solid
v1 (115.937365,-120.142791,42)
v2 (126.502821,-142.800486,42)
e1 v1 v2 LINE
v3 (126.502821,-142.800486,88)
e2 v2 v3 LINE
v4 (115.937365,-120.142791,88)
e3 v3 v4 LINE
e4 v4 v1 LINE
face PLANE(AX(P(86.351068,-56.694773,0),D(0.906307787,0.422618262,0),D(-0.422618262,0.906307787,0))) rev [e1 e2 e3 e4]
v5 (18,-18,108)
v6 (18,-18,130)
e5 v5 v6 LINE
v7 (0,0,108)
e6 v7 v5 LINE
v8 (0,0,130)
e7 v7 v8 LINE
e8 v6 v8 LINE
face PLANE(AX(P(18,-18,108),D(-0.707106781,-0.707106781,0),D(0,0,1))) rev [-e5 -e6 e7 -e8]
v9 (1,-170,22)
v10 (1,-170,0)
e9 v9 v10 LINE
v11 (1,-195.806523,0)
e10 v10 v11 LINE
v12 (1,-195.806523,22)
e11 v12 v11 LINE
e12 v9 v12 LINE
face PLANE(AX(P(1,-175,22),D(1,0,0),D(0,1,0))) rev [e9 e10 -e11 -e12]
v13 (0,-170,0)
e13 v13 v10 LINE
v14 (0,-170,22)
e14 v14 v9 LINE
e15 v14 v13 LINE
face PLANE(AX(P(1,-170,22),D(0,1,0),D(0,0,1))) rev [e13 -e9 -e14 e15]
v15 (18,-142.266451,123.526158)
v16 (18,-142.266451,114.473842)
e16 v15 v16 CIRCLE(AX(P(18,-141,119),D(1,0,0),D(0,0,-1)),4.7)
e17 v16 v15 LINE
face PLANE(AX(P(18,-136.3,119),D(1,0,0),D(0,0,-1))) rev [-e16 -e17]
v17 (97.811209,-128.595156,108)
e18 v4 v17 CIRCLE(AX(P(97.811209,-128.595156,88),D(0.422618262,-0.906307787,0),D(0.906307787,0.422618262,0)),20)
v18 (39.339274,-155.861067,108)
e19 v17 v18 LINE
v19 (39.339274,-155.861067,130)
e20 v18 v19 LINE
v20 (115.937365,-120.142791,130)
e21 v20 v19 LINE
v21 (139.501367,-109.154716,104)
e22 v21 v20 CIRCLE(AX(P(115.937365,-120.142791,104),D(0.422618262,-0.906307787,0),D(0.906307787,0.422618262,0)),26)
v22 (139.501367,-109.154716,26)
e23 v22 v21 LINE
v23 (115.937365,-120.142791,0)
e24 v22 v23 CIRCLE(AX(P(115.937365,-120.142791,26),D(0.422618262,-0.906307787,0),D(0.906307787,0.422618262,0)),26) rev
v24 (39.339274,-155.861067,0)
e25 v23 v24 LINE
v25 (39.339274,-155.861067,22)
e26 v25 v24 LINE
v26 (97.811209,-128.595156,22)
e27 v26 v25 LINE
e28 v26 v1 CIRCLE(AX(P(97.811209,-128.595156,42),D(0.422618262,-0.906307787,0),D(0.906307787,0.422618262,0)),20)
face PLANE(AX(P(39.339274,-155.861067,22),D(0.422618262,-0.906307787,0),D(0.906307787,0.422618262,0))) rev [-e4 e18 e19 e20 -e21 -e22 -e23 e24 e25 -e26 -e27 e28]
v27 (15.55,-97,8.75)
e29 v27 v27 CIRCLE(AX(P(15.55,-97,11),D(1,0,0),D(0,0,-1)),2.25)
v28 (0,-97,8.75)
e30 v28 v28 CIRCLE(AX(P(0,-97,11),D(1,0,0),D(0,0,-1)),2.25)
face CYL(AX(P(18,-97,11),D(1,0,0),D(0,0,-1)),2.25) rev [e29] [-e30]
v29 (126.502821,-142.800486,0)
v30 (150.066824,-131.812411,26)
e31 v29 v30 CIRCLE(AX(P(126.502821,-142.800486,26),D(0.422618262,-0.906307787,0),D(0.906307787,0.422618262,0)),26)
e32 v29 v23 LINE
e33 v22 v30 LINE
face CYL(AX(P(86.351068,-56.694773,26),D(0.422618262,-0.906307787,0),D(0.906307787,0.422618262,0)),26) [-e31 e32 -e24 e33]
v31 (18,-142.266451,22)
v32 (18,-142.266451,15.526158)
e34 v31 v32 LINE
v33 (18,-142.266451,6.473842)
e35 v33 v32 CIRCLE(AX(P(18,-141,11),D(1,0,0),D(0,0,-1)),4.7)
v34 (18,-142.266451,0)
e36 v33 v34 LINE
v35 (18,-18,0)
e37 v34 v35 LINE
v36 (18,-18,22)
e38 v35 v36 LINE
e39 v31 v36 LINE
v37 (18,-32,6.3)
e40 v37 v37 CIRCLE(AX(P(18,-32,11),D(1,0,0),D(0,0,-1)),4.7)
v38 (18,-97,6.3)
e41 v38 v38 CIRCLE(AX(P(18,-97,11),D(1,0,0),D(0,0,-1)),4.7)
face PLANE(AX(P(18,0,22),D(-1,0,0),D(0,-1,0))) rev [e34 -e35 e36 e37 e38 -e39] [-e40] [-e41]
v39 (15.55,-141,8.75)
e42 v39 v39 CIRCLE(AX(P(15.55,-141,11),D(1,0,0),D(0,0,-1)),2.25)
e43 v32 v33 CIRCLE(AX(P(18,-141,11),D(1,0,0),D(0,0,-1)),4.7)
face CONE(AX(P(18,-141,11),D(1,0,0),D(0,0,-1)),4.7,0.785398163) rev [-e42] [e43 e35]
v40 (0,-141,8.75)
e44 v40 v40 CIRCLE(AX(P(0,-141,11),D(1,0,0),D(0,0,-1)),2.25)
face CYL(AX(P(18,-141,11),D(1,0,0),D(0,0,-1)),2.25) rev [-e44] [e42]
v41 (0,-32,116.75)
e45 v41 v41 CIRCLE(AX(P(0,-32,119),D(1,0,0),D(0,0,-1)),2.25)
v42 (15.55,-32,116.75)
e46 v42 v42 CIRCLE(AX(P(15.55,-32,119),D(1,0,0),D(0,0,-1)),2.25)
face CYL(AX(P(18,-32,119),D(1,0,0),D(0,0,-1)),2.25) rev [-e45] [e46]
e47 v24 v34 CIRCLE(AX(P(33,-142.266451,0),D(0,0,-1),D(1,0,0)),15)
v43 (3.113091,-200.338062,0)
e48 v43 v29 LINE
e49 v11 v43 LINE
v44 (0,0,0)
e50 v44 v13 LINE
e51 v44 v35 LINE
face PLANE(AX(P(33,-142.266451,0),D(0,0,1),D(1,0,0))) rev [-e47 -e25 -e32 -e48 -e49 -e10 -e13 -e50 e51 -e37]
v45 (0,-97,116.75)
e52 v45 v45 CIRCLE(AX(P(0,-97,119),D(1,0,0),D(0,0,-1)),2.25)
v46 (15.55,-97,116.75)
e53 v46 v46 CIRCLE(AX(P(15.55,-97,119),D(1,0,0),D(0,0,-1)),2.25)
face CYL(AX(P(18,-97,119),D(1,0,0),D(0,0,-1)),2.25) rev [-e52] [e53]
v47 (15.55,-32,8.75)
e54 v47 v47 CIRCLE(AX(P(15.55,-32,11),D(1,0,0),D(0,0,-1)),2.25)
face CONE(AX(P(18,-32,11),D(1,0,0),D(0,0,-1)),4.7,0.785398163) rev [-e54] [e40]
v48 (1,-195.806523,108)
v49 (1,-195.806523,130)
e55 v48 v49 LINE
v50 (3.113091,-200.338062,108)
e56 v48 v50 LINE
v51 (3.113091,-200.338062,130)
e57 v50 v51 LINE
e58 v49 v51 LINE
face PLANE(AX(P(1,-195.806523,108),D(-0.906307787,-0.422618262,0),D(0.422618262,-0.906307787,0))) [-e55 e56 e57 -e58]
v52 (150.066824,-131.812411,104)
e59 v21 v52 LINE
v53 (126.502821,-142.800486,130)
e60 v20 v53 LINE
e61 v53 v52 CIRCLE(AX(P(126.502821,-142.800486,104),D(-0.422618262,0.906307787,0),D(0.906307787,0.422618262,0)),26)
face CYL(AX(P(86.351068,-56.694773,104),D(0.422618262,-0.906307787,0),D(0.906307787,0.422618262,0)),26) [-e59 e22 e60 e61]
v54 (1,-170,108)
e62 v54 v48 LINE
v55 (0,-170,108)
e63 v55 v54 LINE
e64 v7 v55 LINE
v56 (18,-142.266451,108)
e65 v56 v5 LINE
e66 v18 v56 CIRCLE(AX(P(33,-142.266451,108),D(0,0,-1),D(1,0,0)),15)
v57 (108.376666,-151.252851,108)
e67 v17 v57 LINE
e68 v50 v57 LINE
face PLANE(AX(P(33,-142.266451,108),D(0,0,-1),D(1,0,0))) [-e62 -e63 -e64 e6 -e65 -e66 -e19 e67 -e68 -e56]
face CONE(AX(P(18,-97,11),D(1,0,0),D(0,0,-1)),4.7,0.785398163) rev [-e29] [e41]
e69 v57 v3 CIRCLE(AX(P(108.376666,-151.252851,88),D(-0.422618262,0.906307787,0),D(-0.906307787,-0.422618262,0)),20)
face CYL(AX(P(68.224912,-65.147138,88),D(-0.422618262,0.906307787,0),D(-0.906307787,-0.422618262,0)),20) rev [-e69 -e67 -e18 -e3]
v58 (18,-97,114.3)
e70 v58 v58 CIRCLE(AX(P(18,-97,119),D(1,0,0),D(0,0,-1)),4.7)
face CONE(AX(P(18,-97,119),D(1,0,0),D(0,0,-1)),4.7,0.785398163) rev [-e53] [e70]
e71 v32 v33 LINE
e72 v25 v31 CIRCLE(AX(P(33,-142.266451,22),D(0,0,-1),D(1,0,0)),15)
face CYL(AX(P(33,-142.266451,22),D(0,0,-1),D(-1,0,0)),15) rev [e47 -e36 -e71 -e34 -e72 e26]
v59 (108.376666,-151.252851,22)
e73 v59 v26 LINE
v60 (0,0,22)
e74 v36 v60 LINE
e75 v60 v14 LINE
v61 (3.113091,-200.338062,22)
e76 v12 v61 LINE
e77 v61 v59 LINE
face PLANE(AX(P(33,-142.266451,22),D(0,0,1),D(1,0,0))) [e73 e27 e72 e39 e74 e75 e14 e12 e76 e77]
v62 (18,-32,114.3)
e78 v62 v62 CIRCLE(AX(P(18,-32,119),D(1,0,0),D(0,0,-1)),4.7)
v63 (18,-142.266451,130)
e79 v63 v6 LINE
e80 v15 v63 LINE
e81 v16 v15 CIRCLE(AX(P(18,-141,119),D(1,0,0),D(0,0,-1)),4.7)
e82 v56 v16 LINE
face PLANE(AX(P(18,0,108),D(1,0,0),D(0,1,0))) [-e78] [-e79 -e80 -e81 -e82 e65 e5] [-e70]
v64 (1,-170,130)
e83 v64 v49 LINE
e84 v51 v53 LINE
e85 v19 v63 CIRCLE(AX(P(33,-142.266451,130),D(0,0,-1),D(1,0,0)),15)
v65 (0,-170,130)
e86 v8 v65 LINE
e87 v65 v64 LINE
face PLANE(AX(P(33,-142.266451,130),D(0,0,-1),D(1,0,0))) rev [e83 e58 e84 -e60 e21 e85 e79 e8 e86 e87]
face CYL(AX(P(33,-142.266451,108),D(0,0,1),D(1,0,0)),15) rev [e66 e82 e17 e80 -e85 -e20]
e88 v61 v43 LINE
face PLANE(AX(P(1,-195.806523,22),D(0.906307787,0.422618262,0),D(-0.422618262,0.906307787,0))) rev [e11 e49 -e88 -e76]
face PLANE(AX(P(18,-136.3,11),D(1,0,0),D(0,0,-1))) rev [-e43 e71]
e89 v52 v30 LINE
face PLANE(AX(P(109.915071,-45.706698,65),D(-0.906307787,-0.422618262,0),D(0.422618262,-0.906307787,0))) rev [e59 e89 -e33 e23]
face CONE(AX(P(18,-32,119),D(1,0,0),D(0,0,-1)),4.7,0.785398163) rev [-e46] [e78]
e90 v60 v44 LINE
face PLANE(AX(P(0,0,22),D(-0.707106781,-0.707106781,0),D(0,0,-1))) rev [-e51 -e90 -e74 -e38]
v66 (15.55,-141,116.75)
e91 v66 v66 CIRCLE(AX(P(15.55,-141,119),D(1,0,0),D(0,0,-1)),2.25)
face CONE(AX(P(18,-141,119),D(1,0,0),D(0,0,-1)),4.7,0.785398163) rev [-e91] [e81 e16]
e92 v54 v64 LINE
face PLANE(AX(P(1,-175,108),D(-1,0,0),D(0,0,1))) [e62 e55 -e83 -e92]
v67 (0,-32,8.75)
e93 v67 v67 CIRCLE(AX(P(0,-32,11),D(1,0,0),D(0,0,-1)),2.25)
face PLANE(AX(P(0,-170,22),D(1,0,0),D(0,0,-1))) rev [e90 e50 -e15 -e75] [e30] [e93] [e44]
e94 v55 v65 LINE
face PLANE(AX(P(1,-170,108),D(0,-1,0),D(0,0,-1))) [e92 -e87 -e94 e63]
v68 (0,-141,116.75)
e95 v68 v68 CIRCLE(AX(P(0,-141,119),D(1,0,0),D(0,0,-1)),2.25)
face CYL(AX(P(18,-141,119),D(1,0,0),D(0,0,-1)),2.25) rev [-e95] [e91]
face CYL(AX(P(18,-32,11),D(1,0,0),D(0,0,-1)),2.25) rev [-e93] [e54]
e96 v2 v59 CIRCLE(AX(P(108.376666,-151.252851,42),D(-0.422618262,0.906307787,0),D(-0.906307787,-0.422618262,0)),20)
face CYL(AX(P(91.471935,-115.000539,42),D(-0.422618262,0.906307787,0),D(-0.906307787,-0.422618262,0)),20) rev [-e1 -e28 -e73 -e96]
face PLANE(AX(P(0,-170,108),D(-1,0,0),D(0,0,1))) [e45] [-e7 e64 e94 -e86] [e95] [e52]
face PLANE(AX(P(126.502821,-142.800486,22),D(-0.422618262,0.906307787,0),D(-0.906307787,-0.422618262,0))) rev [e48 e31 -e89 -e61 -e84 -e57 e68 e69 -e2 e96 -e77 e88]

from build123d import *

# Parameters (mm, degrees)
AUFSATZ_LINEAR_AUSTRAGEN1_DEPTH              = 22
AUFSATZ_LINEAR_AUSTRAGEN2_DEPTH              = 25
FORMSENKUNG_F_R_M4_LINSENSENKSCHRAUB_2_COUNT = 2
FORMSENKUNG_F_R_M4_LINSENSENKSCHRAUB_2_PITCH = 109
FORMSENKUNG_F_R_M4_LINSENSENKSCHRAUB_3_COUNT = 2
FORMSENKUNG_F_R_M4_LINSENSENKSCHRAUB_3_PITCH = 65
VERRUNDUNG1_R                                = 20
FASE1_SIZE                                   = 18


with BuildPart() as part:
    # Skizze1 → Aufsatz-Linear austragen1 (new body)
    with BuildSketch(Plane.XY):
        with BuildLine():
            Line((0, 0), (18, 0))
            Line((18, 0), (18, -142.266450527))
            ThreePointArc((18, -142.266450527), (24.940505875, -154.917322215), (39.339273926, -155.861067333))
            Line((39.339273926, -155.861067333), (115.937364916, -120.142790905))
            Line((115.937364916, -120.142790905), (126.502821459, -142.80048558))
            Line((126.502821459, -142.80048558), (3.113091309, -200.338061687))
            Line((3.113091309, -200.338061687), (1, -195.806522752))
            Line((1, -195.806522752), (1, -175))
            Line((1, -175), (1, -170))
            Line((1, -170), (0, -170))
            Line((0, -170), (0, 0))
        make_face()
    aufsatz_linear_austragen1 = extrude(amount=AUFSATZ_LINEAR_AUSTRAGEN1_DEPTH)

    # Skizze2 → Aufsatz-Linear austragen2 (add)
    with BuildSketch(Plane(origin=(77.289946844, -165.748825893, 0), x_dir=(0.9063077870366477, 0.4226182617407045, 0), z_dir=(0.4226182617407045, -0.9063077870366477, 0))):
        with BuildLine():
            Line((54.300399179, 22), (54.300399179, 65))
            Line((54.300399179, 65), (80.300399179, 65))
            Line((80.300399179, 65), (80.300399179, 26))
            ThreePointArc((80.300399179, 26), (72.68517549, 7.615223689), (54.300399179, 0))
            Line((54.300399179, 0), (54.300399179, 22))
        make_face()
    aufsatz_linear_austragen2 = extrude(amount=-AUFSATZ_LINEAR_AUSTRAGEN2_DEPTH)

    # Skizze6 → Formsenkung für M4 Linsensenkschraube mit Schlitz1 (revolve, cut)
    with BuildSketch(Plane(origin=(18, -32, 11), x_dir=(0, 0, -1), z_dir=(0, 1, 0))):
        Polygon((0, 0), (0, 18), (2.25, 18), (2.25, 2.45), (4.7, 0), align=None)
    formsenkung_f_r_m4_linsensenkschraube_mi = revolve(axis=Axis((24.35, -32, 11), (-1, 0, 0)), mode=Mode.SUBTRACT)

    # Formsenkung f_r M4 Linsensenkschraub 2: Formsenkung für M4 Linsensenkschraube mit Schlitz1 ×2
    with Locations(*[(0, -i * FORMSENKUNG_F_R_M4_LINSENSENKSCHRAUB_2_PITCH, 0) for i in range(1, FORMSENKUNG_F_R_M4_LINSENSENKSCHRAUB_2_COUNT)]):
        add(formsenkung_f_r_m4_linsensenkschraube_mi, mode=Mode.SUBTRACT)

    # Formsenkung f_r M4 Linsensenkschraub 3: Formsenkung für M4 Linsensenkschraube mit Schlitz1 ×2
    with Locations(*[(0, -i * FORMSENKUNG_F_R_M4_LINSENSENKSCHRAUB_3_PITCH, 0) for i in range(1, FORMSENKUNG_F_R_M4_LINSENSENKSCHRAUB_3_COUNT)]):
        add(formsenkung_f_r_m4_linsensenkschraube_mi, mode=Mode.SUBTRACT)

    # Spiegeln4: Aufsatz-Linear austragen2 across plane
    add(aufsatz_linear_austragen2.mirror(Plane(origin=(86.351068046, -56.694772515, 65), x_dir=(1, 0, 0), z_dir=(0, 0, -1))))

    # Spiegeln5: Aufsatz-Linear austragen1, Formsenkung für M4 Linsensenkschraube mit Schlitz1 across plane
    add(aufsatz_linear_austragen1.mirror(Plane.XY.offset(65)))
    add(formsenkung_f_r_m4_linsensenkschraube_mi.mirror(Plane.XY.offset(65)), mode=Mode.SUBTRACT)

    # Spiegeln5 copy 1 sketch → Spiegeln5 copy 1 (revolve, cut)
    with BuildSketch(Plane(origin=(18, -141, 119), x_dir=(0, 0, 1), z_dir=(0, 1, 0))):
        Polygon((0, 0), (0, -18), (2.25, -18), (2.25, -2.45), (4.7, 0), align=None)
    revolve(axis=Axis((24.35, -141, 119), (1, 0, 0)), mode=Mode.SUBTRACT)

    # Spiegeln5 copy 2 sketch → Spiegeln5 copy 2 (revolve, cut)
    with BuildSketch(Plane(origin=(18, -97, 119), x_dir=(0, 0, 1), z_dir=(0, 1, 0))):
        Polygon((0, 0), (0, -18), (2.25, -18), (2.25, -2.45), (4.7, 0), align=None)
    revolve(axis=Axis((24.35, -97, 119), (1, 0, 0)), mode=Mode.SUBTRACT)

    # Verrundung1
    verrundung1_edges = [part.edges().sort_by_distance(p)[0] for p in [
        (121.220093187, -131.471638242, 22),
        (121.220093187, -131.471638242, 108),
    ]]
    fillet(verrundung1_edges, radius=VERRUNDUNG1_R)

    # Fase1
    fase1_edges = [part.edges().sort_by_distance(p)[0] for p in [
        (18, 0, 119),
        (18, 0, 11),
    ]]
    chamfer(fase1_edges, length=FASE1_SIZE - 0.0001)  # a hair under: the kernel refuses the full size


solid = part.part
